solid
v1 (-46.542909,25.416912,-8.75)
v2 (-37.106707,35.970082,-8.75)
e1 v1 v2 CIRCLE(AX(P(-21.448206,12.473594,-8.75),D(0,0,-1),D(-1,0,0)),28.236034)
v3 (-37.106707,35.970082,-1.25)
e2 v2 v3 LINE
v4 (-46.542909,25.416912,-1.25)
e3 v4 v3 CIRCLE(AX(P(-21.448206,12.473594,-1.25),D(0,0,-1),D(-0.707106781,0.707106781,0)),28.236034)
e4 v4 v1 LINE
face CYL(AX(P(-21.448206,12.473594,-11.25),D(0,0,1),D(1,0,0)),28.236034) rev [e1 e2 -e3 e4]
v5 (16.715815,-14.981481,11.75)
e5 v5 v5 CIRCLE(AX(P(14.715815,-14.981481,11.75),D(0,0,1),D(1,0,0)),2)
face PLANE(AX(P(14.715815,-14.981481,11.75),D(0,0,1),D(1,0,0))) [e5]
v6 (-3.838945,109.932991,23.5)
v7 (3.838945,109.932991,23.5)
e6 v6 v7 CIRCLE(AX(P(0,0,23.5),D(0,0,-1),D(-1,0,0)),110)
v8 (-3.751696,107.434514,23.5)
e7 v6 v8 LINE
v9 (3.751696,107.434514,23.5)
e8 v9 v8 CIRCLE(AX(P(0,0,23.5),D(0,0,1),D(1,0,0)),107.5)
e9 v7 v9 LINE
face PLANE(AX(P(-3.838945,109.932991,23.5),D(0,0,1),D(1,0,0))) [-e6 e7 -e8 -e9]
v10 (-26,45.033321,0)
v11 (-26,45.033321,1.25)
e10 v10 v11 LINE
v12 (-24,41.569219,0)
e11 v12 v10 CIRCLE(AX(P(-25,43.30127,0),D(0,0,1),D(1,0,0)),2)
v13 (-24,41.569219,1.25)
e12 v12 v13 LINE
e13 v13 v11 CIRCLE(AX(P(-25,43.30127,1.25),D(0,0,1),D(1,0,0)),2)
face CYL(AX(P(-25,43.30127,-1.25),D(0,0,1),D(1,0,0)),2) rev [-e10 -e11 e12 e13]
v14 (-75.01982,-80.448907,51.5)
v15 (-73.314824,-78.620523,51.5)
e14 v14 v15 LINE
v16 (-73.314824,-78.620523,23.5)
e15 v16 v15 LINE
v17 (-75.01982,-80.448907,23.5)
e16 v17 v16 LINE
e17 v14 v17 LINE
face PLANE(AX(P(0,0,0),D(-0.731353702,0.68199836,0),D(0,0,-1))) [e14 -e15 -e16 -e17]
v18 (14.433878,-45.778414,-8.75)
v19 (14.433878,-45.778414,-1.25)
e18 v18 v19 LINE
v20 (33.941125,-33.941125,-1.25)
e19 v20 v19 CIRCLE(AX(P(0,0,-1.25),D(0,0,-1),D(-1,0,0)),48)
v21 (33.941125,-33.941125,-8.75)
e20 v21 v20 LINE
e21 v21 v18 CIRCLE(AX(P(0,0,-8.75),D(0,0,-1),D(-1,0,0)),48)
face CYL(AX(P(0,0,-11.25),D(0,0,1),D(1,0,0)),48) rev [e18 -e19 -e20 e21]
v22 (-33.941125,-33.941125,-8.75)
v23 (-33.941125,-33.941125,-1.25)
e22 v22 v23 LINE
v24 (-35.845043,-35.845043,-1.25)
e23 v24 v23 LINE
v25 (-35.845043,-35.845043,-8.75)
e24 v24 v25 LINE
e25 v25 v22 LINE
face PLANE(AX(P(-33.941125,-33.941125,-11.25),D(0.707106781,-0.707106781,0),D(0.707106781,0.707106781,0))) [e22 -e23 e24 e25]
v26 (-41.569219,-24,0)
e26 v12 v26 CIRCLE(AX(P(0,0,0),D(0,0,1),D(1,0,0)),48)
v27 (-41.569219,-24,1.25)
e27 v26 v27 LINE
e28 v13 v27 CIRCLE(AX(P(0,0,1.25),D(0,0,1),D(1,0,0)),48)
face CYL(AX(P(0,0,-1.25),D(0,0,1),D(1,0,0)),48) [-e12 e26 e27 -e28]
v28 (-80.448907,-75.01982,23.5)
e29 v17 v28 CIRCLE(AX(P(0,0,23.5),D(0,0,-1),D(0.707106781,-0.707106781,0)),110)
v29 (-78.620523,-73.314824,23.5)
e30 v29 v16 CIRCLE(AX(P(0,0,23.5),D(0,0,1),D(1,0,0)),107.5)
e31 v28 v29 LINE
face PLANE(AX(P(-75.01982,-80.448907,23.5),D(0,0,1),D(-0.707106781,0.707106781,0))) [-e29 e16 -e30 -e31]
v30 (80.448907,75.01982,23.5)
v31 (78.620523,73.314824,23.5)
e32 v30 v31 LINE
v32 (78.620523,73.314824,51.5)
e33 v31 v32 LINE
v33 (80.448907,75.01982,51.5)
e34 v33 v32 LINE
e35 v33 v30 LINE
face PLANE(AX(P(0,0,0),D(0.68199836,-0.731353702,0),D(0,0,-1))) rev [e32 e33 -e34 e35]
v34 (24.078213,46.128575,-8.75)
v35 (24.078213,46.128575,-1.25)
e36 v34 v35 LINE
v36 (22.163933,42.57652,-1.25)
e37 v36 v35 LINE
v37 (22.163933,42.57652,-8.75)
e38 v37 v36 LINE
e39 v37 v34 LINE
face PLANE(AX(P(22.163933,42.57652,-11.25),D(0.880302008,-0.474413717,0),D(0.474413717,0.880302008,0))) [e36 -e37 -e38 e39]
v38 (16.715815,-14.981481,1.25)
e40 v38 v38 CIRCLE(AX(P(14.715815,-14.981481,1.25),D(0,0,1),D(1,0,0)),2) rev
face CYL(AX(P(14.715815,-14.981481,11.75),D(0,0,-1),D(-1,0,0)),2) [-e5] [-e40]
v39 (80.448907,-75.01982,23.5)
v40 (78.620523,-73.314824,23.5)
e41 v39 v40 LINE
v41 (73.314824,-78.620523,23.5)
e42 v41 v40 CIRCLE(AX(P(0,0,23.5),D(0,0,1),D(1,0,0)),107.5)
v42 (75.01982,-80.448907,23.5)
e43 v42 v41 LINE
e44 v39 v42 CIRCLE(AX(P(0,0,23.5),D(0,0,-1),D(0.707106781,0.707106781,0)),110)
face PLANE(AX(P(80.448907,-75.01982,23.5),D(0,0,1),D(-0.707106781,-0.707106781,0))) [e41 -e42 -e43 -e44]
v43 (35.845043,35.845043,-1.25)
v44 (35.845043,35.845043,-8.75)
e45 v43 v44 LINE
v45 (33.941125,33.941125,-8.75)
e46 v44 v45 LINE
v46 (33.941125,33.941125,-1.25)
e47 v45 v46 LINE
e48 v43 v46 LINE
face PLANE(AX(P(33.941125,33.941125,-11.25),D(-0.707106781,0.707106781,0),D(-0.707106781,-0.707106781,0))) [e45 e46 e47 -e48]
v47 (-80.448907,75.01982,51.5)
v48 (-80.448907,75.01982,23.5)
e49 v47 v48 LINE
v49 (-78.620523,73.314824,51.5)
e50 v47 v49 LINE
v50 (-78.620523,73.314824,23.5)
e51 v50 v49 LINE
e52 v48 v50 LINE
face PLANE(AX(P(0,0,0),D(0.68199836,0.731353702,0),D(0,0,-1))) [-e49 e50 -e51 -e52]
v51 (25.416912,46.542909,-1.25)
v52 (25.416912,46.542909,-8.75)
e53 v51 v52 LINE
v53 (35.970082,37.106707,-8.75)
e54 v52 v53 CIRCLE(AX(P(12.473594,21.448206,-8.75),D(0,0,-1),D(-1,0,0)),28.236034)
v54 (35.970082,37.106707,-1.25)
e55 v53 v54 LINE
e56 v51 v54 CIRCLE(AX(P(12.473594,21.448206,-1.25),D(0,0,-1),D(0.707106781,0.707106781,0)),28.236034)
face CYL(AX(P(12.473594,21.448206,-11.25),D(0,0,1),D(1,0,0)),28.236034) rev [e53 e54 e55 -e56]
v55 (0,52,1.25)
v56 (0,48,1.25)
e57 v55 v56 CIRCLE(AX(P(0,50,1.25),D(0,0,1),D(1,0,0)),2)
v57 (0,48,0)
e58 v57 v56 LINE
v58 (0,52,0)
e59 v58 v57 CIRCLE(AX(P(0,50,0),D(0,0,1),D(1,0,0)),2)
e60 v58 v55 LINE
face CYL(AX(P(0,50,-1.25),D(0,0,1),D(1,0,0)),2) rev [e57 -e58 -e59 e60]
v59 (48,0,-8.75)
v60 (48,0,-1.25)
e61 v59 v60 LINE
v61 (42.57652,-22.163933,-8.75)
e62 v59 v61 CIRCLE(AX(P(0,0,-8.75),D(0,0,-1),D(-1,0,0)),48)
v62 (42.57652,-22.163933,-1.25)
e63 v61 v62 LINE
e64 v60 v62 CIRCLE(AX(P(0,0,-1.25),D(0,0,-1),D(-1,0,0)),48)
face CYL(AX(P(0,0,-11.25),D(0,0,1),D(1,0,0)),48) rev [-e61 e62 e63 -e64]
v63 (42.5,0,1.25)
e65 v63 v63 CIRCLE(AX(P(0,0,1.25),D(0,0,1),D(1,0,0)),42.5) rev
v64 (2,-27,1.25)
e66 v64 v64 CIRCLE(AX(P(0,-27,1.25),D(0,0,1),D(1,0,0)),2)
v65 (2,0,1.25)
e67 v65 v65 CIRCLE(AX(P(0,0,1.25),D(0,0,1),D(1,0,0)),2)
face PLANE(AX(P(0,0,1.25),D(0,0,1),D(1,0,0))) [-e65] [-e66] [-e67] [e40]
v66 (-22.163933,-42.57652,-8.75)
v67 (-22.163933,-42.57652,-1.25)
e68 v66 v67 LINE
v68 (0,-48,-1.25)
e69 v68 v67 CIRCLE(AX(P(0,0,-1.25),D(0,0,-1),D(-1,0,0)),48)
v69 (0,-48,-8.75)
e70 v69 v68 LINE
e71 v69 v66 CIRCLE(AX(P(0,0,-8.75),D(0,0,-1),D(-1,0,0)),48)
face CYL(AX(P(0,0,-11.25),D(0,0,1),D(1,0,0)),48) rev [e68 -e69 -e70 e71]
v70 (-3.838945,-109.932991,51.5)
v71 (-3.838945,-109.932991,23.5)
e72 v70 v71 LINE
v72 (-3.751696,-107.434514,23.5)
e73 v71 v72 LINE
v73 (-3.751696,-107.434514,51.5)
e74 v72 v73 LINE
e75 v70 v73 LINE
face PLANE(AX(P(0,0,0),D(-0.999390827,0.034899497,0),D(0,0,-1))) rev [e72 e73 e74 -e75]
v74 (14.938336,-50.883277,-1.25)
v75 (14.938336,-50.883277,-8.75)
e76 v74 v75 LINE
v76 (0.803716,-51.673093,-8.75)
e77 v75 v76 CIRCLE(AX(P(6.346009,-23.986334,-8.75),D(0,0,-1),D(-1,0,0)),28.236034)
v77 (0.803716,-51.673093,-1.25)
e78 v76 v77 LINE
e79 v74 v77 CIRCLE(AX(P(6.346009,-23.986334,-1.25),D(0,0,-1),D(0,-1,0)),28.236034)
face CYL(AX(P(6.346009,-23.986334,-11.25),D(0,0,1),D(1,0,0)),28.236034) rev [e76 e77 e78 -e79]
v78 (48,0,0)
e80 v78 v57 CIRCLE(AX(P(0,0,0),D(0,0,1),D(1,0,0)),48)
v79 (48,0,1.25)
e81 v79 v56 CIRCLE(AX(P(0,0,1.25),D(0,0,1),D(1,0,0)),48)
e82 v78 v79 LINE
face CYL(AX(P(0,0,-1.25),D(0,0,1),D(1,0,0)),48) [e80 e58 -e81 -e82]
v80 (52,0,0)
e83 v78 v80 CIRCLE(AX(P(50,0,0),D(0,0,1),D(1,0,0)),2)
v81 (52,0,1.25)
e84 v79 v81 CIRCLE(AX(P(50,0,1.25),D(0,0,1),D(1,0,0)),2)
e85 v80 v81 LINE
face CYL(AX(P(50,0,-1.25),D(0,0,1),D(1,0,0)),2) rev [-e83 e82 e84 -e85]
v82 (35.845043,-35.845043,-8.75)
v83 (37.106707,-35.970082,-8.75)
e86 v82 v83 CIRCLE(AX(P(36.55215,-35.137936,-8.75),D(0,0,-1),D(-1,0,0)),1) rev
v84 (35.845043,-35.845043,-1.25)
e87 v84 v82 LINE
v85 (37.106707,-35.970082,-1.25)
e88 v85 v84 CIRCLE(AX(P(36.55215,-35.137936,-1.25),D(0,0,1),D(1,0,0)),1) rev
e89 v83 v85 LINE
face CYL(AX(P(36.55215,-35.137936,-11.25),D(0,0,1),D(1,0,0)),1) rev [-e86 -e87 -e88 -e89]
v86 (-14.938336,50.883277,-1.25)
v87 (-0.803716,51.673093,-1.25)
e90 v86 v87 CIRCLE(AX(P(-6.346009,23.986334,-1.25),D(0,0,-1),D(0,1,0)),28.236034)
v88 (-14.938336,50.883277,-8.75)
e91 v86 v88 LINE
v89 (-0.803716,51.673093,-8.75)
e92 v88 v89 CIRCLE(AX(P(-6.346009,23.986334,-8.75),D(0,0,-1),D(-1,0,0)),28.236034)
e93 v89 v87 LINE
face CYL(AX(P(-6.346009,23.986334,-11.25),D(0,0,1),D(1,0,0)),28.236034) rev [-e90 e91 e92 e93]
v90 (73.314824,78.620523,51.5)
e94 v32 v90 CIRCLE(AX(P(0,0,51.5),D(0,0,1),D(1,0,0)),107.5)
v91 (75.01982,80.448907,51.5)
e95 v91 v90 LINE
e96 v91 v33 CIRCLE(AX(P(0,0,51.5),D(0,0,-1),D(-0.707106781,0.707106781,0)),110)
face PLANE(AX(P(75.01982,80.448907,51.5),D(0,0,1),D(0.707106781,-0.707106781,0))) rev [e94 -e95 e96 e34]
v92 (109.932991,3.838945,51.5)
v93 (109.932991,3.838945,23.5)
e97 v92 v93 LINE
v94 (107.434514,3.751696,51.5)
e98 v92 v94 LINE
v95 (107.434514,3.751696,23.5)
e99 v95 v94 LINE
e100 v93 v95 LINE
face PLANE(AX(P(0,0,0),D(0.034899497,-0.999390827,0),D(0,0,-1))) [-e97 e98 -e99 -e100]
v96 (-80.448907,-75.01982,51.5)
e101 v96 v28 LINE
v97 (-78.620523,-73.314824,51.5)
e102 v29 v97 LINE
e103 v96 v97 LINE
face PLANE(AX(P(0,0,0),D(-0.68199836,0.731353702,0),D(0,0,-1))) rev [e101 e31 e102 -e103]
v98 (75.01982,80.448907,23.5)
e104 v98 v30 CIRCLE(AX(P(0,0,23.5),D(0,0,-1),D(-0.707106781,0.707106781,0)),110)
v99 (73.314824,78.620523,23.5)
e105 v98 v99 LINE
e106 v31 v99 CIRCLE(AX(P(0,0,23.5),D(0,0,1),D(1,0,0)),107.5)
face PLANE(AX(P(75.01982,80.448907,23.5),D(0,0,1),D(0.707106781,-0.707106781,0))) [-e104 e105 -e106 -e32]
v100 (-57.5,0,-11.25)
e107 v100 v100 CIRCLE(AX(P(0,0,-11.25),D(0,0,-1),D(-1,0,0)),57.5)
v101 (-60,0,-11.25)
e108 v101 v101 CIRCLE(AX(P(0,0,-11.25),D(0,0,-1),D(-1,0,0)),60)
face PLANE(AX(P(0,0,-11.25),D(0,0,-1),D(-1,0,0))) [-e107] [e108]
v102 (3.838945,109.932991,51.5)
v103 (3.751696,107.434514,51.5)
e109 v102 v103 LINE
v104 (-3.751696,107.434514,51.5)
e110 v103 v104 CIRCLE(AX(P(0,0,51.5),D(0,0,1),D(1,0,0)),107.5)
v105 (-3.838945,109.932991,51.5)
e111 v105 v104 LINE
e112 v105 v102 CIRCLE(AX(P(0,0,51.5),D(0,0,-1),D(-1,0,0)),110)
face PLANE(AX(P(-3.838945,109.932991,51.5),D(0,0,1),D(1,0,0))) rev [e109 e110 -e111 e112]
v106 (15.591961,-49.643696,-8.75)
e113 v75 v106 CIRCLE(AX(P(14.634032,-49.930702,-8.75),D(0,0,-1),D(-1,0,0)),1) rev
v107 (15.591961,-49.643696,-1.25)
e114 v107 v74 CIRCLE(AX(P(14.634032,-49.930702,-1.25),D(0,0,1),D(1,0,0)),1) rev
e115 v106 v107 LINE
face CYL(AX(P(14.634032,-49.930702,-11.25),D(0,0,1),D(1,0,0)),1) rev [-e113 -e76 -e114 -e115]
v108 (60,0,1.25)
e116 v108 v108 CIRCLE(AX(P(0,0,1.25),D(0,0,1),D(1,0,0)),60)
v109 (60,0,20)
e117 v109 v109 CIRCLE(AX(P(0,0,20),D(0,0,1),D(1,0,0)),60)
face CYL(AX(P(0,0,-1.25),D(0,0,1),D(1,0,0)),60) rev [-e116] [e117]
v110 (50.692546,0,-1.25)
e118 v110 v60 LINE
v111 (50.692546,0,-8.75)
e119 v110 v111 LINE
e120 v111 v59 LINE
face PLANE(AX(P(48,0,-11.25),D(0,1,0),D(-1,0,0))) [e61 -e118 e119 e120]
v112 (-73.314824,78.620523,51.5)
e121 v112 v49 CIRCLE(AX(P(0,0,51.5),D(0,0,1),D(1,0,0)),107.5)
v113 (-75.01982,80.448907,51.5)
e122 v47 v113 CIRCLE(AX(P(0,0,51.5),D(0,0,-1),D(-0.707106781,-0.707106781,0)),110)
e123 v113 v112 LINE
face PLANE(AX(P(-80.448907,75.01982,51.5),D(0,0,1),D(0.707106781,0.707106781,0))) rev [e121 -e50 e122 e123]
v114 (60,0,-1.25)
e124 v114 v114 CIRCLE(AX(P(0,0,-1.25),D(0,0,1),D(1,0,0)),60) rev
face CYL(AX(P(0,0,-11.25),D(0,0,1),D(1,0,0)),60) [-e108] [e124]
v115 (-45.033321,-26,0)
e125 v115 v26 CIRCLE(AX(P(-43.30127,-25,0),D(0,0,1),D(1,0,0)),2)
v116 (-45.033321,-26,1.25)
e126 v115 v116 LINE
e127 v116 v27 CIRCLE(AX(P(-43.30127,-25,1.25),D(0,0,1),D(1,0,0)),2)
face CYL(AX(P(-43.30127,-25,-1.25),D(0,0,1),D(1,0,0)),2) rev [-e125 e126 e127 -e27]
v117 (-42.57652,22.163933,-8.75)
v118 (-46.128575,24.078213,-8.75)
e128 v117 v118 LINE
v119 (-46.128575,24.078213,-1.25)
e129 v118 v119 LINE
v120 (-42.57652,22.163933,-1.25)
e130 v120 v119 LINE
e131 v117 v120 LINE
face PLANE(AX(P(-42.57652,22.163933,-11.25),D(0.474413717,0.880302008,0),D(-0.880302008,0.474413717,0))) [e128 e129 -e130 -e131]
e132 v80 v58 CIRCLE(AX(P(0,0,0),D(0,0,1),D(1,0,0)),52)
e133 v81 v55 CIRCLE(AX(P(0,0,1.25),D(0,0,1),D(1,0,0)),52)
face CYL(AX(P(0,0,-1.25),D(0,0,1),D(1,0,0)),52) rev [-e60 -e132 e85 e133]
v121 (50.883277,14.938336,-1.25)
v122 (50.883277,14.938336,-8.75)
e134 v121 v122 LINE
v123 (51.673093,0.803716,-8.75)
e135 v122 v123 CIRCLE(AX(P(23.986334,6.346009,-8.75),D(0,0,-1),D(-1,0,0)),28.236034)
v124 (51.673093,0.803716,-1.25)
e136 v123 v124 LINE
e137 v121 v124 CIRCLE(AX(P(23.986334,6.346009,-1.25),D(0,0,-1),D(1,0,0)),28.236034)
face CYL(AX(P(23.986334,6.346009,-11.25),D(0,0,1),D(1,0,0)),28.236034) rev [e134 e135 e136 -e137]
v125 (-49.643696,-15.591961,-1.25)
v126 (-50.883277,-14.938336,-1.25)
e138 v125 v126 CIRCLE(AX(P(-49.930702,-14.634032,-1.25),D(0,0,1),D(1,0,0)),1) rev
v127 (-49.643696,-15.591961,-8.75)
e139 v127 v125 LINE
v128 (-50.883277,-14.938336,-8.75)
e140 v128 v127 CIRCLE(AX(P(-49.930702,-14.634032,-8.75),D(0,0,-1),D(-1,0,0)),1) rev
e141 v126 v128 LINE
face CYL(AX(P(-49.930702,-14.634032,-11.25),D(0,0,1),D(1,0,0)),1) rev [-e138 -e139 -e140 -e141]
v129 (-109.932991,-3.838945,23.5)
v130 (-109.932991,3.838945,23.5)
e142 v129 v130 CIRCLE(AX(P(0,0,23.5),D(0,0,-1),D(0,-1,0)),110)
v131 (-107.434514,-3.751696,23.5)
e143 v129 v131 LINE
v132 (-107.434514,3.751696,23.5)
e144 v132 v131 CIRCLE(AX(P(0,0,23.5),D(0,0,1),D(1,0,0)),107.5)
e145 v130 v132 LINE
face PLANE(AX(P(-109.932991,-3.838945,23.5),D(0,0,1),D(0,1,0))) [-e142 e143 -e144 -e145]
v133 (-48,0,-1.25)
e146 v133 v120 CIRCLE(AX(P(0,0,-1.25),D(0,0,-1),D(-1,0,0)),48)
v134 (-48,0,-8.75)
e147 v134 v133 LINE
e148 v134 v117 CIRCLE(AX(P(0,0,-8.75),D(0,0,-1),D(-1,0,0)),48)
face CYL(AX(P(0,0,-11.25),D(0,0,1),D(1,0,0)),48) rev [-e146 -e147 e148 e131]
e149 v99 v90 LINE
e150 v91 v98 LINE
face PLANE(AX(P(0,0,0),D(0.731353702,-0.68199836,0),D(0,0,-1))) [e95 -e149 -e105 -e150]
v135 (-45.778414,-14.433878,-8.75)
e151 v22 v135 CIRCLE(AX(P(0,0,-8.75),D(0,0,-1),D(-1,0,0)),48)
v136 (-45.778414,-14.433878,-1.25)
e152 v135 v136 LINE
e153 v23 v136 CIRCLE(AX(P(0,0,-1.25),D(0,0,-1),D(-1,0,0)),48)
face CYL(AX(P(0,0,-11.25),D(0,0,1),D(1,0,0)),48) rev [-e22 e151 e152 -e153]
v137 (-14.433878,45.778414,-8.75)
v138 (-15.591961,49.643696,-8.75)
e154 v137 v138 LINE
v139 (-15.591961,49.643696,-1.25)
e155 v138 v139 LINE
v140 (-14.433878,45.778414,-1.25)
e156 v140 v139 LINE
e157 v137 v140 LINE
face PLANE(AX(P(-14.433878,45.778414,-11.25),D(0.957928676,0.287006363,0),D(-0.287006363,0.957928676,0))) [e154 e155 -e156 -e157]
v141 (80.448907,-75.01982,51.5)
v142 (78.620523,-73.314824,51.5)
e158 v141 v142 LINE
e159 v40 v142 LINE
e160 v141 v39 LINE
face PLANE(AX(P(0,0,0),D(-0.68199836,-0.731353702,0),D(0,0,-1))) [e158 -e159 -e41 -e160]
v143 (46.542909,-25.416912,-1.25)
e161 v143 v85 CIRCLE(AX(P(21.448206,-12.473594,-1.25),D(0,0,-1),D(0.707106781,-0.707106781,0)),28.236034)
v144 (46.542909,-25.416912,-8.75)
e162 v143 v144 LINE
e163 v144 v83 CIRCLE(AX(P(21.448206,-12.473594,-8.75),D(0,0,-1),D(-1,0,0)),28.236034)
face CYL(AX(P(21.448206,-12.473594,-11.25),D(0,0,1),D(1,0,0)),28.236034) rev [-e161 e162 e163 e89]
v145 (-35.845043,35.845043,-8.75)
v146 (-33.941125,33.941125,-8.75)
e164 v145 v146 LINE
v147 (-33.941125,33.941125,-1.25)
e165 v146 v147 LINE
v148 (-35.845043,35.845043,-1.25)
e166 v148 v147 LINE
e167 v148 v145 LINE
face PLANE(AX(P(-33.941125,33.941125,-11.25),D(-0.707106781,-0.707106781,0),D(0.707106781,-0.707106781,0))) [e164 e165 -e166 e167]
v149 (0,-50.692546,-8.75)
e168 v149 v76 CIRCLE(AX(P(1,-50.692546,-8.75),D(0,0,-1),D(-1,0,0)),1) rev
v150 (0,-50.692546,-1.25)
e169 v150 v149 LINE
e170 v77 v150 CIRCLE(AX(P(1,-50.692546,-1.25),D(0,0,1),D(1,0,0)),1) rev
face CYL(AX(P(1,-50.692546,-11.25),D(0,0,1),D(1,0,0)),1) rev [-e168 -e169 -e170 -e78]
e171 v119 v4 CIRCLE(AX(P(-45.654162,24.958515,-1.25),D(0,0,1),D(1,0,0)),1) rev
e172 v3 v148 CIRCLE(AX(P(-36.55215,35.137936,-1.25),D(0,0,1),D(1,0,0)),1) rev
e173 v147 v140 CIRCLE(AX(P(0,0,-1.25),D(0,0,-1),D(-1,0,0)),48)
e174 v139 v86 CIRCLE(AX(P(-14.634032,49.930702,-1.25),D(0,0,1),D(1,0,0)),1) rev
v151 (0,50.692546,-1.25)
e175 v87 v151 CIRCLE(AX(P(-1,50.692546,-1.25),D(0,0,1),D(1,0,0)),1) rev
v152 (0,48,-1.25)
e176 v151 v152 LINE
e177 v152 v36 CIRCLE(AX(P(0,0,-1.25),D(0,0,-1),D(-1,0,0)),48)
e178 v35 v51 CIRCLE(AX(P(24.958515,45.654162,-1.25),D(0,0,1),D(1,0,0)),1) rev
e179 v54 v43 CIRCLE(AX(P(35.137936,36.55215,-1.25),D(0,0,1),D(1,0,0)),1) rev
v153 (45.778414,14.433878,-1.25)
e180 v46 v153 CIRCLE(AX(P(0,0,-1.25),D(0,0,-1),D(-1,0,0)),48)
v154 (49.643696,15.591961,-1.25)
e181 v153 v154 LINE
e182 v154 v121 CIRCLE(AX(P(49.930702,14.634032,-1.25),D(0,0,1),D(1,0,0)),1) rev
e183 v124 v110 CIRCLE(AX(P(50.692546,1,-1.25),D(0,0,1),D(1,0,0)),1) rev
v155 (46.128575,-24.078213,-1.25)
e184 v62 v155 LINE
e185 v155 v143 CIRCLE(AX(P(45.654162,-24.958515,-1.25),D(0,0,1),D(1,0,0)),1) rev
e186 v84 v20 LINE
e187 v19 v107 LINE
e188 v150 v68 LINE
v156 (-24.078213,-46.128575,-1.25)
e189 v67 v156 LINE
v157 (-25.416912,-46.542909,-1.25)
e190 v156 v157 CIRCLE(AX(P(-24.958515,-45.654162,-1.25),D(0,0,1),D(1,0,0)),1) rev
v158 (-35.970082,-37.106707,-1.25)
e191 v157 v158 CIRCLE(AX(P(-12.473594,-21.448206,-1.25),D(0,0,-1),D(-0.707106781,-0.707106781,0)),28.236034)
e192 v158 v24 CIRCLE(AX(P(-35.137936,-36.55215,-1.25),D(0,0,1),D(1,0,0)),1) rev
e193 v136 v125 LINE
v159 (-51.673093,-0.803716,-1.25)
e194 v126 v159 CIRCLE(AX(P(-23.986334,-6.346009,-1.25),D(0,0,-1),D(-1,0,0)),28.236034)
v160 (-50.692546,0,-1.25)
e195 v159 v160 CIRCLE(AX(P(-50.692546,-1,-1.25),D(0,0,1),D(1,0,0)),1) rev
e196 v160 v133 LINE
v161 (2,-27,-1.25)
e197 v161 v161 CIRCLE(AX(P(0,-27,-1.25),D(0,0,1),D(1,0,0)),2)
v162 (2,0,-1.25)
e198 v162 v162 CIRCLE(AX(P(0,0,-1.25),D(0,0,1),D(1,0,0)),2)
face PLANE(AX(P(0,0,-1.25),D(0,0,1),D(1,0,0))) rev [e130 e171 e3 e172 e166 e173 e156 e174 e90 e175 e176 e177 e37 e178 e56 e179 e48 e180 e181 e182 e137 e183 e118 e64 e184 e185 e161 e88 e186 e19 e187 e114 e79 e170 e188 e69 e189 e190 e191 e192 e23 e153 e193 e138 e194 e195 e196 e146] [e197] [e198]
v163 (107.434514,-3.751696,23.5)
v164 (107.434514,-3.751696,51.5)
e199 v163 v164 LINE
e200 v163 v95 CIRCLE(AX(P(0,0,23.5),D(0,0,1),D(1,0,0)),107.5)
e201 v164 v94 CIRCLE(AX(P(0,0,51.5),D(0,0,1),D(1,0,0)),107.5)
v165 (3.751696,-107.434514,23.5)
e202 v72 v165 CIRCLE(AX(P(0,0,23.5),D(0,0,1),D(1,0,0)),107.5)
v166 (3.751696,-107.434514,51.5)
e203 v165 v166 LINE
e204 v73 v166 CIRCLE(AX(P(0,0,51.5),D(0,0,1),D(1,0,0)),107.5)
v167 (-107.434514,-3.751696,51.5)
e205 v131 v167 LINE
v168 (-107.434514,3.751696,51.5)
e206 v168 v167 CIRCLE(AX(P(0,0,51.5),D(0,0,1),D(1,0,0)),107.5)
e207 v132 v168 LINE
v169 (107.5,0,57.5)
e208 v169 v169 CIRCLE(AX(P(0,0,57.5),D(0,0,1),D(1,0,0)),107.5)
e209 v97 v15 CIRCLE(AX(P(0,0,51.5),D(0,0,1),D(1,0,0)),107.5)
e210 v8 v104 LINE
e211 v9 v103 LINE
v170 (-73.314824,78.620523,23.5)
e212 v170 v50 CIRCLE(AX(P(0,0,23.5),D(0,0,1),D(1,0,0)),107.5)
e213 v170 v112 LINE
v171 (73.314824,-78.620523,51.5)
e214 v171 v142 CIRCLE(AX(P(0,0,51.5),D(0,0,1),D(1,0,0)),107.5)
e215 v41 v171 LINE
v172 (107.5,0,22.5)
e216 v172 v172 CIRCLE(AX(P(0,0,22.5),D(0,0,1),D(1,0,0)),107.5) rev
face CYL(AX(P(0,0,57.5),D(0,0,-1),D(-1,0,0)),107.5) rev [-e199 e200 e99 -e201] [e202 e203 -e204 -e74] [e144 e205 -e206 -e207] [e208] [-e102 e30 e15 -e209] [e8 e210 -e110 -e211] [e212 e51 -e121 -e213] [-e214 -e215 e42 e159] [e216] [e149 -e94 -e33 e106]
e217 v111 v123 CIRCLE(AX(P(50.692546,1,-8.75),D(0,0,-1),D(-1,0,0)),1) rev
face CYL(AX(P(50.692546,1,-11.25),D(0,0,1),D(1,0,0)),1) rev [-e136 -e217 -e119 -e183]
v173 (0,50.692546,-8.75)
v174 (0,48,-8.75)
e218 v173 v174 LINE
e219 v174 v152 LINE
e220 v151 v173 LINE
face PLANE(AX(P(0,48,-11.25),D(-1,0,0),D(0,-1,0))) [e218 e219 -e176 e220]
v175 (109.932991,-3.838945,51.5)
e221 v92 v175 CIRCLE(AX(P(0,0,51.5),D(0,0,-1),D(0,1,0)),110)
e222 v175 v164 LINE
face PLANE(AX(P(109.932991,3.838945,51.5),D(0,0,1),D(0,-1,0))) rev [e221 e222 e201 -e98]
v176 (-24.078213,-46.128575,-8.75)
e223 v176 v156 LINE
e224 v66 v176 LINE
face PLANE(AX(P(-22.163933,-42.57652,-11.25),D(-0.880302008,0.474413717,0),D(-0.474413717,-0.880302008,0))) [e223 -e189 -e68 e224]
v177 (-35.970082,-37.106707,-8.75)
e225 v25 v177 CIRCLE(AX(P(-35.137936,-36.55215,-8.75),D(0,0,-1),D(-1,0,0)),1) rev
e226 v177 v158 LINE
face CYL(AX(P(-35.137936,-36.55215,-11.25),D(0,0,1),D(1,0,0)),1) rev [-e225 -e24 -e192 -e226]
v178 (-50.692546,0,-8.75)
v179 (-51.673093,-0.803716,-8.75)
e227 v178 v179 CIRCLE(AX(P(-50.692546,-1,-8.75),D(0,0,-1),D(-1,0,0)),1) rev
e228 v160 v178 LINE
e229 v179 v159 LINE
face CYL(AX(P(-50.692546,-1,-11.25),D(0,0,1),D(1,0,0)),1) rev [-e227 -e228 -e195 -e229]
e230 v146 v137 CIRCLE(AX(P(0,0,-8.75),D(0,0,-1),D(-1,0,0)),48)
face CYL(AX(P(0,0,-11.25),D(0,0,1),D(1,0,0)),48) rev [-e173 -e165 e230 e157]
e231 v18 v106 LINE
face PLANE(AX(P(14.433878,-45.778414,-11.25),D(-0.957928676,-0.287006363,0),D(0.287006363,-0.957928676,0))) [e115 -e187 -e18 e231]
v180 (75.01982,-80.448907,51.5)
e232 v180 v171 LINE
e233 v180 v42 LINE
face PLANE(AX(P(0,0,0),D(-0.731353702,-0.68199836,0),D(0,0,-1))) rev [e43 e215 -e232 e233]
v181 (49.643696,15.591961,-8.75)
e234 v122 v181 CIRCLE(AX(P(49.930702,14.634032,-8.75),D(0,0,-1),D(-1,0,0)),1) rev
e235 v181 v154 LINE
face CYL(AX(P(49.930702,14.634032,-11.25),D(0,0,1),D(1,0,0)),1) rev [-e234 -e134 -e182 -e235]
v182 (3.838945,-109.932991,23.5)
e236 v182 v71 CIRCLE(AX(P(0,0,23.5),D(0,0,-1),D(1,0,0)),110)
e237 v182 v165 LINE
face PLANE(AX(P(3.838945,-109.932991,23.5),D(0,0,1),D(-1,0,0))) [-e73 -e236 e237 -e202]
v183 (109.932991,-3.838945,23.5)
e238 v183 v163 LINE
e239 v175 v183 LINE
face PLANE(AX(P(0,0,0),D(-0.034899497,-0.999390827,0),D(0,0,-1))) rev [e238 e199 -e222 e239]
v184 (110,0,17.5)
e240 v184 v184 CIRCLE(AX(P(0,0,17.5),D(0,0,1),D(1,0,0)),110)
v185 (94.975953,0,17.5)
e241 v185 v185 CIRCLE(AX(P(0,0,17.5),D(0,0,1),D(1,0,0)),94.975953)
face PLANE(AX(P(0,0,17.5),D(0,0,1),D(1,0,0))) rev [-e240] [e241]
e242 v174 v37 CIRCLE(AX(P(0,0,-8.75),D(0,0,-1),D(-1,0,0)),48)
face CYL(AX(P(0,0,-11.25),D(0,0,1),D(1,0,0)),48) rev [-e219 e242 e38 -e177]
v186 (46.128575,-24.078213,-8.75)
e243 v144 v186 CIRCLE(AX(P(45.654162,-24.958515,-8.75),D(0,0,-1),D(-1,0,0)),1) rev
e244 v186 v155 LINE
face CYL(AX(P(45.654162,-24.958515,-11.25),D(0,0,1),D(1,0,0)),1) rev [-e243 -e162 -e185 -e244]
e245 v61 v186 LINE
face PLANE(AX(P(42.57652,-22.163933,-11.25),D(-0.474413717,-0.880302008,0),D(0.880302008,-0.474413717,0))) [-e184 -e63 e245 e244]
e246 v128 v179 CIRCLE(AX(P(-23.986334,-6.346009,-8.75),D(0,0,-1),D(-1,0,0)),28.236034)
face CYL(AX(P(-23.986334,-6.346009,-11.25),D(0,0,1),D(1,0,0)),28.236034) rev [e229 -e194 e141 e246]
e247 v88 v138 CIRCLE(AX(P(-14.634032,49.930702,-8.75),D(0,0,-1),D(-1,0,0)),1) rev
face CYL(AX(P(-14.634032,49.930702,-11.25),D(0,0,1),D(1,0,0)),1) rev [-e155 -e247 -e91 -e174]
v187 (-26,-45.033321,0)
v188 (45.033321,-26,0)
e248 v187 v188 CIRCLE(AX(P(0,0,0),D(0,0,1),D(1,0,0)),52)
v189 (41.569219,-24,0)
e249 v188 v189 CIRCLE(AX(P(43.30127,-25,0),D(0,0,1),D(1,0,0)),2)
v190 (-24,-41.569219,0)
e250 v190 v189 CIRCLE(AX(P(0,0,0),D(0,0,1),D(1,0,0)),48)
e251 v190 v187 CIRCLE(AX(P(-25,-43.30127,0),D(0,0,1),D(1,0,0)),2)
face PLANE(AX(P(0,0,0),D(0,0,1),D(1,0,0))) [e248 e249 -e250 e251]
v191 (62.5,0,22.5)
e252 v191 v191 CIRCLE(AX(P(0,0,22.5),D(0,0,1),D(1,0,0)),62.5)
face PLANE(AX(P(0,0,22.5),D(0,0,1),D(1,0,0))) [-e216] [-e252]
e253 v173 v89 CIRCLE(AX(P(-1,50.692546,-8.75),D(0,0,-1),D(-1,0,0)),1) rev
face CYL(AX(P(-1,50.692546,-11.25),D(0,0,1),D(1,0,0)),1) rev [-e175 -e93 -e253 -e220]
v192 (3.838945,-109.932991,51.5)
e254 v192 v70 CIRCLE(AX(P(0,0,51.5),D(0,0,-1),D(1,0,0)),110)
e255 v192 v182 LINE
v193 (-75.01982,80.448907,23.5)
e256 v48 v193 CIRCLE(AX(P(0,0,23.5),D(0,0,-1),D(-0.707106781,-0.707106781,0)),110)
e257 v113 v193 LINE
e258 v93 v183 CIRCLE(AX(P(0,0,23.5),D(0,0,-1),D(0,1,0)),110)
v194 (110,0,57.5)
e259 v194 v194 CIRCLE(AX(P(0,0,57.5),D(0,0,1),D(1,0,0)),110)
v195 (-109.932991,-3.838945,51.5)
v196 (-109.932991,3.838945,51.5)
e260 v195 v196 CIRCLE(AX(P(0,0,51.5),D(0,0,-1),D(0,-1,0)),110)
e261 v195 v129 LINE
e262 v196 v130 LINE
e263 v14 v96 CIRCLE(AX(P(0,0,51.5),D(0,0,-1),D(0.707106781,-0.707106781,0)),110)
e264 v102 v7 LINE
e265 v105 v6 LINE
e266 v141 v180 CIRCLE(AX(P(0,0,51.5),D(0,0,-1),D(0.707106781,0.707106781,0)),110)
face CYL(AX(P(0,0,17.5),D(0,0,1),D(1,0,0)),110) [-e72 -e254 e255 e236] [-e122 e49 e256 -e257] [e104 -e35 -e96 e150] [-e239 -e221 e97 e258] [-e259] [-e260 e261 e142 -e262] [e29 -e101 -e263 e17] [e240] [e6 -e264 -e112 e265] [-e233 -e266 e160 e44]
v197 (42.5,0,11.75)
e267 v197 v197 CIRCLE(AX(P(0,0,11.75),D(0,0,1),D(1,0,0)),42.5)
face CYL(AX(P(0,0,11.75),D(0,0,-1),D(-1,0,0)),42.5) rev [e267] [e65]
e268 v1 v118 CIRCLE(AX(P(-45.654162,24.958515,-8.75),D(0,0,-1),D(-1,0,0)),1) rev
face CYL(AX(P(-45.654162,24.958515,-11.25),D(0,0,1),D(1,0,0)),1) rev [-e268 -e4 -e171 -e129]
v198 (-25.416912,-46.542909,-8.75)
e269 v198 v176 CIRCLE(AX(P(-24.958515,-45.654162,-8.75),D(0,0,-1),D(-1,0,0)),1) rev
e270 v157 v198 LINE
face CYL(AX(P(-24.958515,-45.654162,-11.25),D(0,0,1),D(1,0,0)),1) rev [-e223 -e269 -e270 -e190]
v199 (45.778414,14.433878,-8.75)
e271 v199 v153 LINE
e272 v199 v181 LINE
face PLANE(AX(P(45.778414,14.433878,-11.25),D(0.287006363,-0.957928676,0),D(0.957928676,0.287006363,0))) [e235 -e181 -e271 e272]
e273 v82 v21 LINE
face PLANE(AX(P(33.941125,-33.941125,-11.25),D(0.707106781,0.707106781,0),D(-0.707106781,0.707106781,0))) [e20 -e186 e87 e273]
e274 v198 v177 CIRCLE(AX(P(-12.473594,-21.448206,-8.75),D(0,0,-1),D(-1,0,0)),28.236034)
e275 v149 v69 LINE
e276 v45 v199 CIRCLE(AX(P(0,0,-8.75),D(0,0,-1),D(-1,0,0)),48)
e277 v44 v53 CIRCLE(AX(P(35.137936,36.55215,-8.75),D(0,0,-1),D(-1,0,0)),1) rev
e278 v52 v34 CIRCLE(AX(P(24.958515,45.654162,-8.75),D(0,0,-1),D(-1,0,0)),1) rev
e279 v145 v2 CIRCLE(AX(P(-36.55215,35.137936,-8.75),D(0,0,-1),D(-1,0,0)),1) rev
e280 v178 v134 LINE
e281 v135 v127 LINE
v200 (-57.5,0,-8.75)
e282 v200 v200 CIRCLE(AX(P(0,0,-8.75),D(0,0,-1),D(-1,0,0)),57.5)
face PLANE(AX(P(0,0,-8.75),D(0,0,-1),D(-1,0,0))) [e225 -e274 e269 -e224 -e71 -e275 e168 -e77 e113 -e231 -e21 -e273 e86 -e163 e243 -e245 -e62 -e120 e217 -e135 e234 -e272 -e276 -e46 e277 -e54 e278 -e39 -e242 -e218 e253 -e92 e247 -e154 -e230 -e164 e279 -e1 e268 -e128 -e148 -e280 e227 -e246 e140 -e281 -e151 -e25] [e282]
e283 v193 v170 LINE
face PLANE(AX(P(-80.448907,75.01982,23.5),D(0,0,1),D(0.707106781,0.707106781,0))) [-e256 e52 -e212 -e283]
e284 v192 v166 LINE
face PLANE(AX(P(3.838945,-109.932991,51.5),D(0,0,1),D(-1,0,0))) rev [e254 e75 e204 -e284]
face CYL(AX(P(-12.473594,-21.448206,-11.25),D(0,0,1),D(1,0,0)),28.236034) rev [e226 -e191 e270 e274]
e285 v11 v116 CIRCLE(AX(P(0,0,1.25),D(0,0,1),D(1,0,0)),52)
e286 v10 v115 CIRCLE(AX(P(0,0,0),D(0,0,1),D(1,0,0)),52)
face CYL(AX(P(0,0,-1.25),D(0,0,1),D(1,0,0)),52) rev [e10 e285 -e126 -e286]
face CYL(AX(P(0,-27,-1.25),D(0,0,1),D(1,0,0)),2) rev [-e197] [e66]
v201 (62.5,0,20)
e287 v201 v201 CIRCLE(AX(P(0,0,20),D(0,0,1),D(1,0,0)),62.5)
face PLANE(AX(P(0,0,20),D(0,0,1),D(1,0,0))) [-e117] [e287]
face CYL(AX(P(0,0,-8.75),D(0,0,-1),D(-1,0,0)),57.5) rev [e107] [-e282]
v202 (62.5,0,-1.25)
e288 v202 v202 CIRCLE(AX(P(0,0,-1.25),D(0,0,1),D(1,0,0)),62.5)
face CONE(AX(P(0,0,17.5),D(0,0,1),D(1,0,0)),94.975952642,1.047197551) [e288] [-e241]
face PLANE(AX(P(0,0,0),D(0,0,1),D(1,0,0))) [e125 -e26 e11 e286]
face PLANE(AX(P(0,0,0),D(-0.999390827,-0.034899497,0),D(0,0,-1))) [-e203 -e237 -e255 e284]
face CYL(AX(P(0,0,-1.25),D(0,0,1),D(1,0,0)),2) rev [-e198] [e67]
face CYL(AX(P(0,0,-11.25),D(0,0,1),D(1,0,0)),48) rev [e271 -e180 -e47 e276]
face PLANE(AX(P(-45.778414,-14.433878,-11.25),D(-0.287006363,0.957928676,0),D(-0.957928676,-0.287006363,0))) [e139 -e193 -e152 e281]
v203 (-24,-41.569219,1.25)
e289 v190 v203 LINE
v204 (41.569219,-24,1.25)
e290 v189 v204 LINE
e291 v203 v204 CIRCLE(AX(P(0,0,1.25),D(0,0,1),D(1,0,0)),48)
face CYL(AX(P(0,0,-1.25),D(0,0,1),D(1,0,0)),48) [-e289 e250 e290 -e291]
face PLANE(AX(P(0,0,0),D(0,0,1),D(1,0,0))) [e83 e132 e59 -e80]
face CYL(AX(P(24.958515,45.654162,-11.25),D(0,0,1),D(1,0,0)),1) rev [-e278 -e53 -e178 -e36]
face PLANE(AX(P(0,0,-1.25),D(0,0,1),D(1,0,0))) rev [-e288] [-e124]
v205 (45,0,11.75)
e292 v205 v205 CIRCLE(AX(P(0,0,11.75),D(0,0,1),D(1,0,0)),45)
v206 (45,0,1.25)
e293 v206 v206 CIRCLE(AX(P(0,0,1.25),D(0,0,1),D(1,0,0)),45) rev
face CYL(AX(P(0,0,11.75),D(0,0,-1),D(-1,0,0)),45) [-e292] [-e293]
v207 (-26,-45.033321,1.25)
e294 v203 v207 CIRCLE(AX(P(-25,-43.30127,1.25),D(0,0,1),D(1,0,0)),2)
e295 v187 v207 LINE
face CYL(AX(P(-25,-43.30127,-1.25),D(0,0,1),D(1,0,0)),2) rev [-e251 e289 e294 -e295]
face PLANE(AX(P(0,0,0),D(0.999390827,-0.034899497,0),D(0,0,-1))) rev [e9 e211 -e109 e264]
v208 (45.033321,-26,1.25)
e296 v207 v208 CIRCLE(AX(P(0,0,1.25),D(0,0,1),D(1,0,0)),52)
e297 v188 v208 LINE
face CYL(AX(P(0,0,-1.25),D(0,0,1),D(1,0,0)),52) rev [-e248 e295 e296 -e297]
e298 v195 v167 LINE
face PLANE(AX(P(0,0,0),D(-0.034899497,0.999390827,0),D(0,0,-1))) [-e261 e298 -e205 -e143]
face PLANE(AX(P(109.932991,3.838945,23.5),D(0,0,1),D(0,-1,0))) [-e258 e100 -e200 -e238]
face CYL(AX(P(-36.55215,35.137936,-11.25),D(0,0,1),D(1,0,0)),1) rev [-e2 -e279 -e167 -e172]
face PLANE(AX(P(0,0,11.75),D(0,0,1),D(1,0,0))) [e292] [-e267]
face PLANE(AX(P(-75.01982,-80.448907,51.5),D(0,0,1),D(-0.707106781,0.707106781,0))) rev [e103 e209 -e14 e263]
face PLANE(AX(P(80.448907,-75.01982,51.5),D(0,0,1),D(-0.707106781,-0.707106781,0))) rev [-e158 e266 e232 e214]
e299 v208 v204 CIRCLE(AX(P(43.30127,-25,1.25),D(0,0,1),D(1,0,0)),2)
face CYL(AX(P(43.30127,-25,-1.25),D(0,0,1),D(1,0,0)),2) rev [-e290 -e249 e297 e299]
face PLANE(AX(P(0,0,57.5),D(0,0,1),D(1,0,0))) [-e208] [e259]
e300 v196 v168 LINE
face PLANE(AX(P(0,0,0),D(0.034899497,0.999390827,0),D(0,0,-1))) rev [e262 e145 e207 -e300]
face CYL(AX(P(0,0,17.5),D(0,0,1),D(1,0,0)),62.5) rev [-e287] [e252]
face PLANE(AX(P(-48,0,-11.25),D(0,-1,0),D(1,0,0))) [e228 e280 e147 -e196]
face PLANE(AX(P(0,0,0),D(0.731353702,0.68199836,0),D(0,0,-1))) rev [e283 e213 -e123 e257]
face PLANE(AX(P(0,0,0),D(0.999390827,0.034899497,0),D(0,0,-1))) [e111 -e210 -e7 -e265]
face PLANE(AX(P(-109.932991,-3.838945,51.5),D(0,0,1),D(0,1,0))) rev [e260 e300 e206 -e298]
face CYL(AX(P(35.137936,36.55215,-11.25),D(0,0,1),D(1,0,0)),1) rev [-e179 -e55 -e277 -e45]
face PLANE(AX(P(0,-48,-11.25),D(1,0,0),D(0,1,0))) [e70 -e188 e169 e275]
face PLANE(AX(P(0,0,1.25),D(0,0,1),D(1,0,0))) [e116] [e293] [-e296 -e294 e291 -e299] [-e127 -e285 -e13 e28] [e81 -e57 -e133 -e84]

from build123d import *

# Parameters (mm, degrees)
BOSS_EXTRUDE1_DEPTH      = 1.25
BOSS_EXTRUDE1_DEPTH_BACK = 1.25
SKETCH1_R                = 60
SKETCH1_R_2              = 45
SKETCH1_R_3              = 42.5
SKETCH1_R_4              = 2
SKETCH1_3_R              = 45
SKETCH1_3_R_2            = 42.5
SKETCH1_3_R_3            = 2
BOSS_EXTRUDE2_DEPTH      = 11.75
BOSS_EXTRUDE3_DEPTH      = 20
BOSS_EXTRUDE3_DEPTH_BACK = 1.25
SKETCH1_4_R              = 62.5
SKETCH1_4_R_2            = 60
BOSS_EXTRUDE4_START      = -1.25
BOSS_EXTRUDE4_DEPTH      = 1.25
BOSS_EXTRUDE5_DEPTH      = 2.5
BOSS_EXTRUDE5_DEPTH_BACK = 2.5
SKETCH2_R                = 110
SKETCH2_R_2              = 107.5
SKETCH2_R_3              = 62.5
SKETCH3_R                = 110
SKETCH3_R_2              = 107.5
BOSS_EXTRUDE6_DEPTH      = 35
BOSS_EXTRUDE7_START      = 10
SKETCH5_R                = 60
SKETCH5_R_2              = 48
BOSS_EXTRUDE7_DEPTH      = 10
CUT_EXTRUDE1_DEPTH       = 167.287589735
FILLET1_R                = 1
CIRPATTERN2_COUNT        = 8
FILLET1_OF_CIRPATTERN2_R = 1
SKETCH7_R                = 57.5
CUT_EXTRUDE2_DEPTH       = 2.5
CUT_REVOLVE1_START       = 23.5
CUT_REVOLVE1_DEPTH       = 28
CIRPATTERN3_COUNT        = 8


# Read off the part's stored shape, not the designer's step: Cut-Revolve1
with BuildPart() as part:
    # Sketch1 → Boss-Extrude1 (new, two sides: drawn at the far end of the back side and taken through both)
    # profile 1 of 4: a face of its own
    with BuildSketch(Plane.XY.offset(-BOSS_EXTRUDE1_DEPTH_BACK)):
        Circle(SKETCH1_R)
        Circle(SKETCH1_R_2, mode=Mode.SUBTRACT)
        with BuildLine():
            ThreePointArc((-45.033320997, -26), (-42.301270189, -26.732050808), (-41.569219382, -24))
            ThreePointArc((-41.569219382, -24), (-46.364439662, 12.423314165), (-24, 41.569219382))
            ThreePointArc((-24, 41.569219382), (-23.267949192, 44.301270189), (-26, 45.033320997))
            ThreePointArc((-26, 45.033320997), (-50.228142967, 13.458590345), (-45.033320997, -26))
        make_face(mode=Mode.SUBTRACT)
        with BuildLine():
            ThreePointArc((45.033320997, -26), (44.301270189, -23.267949192), (41.569219382, -24))
            ThreePointArc((41.569219382, -24), (12.423314165, -46.364439662), (-24, -41.569219382))
            ThreePointArc((-24, -41.569219382), (-26.732050808, -42.301270189), (-26, -45.033320997))
            ThreePointArc((-26, -45.033320997), (13.458590345, -50.228142967), (45.033320997, -26))
        make_face(mode=Mode.SUBTRACT)
        with BuildLine():
            ThreePointArc((0, 52), (-2, 50), (0, 48))
            ThreePointArc((0, 48), (33.941125497, 33.941125497), (48, 0))
            ThreePointArc((48, 0), (50, -2), (52, 0))
            ThreePointArc((52, 0), (36.769552622, 36.769552622), (0, 52))
        make_face(mode=Mode.SUBTRACT)
    # profile 2 of 4: a face of its own
    with BuildSketch(Plane.XY.offset(-BOSS_EXTRUDE1_DEPTH_BACK)):
        Circle(SKETCH1_R_2)
        Circle(SKETCH1_R_3, mode=Mode.SUBTRACT)
    # profile 3 of 4: a face of its own
    with BuildSketch(Plane.XY.offset(-BOSS_EXTRUDE1_DEPTH_BACK)):
        Circle(SKETCH1_R_3)
        Circle(SKETCH1_R_4, mode=Mode.SUBTRACT)
        with Locations((14.715815051, -14.981481481)):
            Circle(SKETCH1_R_4, mode=Mode.SUBTRACT)
        with Locations((0, -27)):
            Circle(SKETCH1_R_4, mode=Mode.SUBTRACT)
    # profile 4 of 4: a face of its own
    with BuildSketch(Plane.XY.offset(-BOSS_EXTRUDE1_DEPTH_BACK)):
        with Locations((14.715815051, -14.981481481)):
            Circle(SKETCH1_R_4)
    extrude(amount=BOSS_EXTRUDE1_DEPTH + BOSS_EXTRUDE1_DEPTH_BACK)

    # Sketch1<3> → Boss-Extrude2 (add)
    # profile 1 of 2: a face of its own
    with BuildSketch(Plane.XY):
        Circle(SKETCH1_3_R)
        Circle(SKETCH1_3_R_2, mode=Mode.SUBTRACT)
    # profile 2 of 2: a face of its own
    with BuildSketch(Plane.XY):
        with Locations((14.715815051, -14.981481481)):
            Circle(SKETCH1_3_R_3)
    extrude(amount=BOSS_EXTRUDE2_DEPTH)

    # Sketch1<4> → Boss-Extrude3 (add, two sides: drawn at the far end of the back side and taken through both)
    with BuildSketch(Plane.XY.offset(-BOSS_EXTRUDE3_DEPTH_BACK)):
        Circle(SKETCH1_4_R)
        Circle(SKETCH1_4_R_2, mode=Mode.SUBTRACT)
    extrude(amount=BOSS_EXTRUDE3_DEPTH + BOSS_EXTRUDE3_DEPTH_BACK)

    # Sketch1<5> → Boss-Extrude4 (add)
    with BuildSketch(Plane.XY.offset(BOSS_EXTRUDE4_START)):
        with BuildLine():
            ThreePointArc((52, 0), (36.769552622, 36.769552622), (0, 52))
            ThreePointArc((0, 52), (-2, 50), (0, 48))
            ThreePointArc((0, 48), (33.941125497, 33.941125497), (48, 0))
            ThreePointArc((48, 0), (50, -2), (52, 0))
        make_face()
        with BuildLine():
            ThreePointArc((-26, 45.033320997), (-50.228142967, 13.458590345), (-45.033320997, -26))
            ThreePointArc((-45.033320997, -26), (-42.301270189, -26.732050808), (-41.569219382, -24))
            ThreePointArc((-41.569219382, -24), (-46.364439662, 12.423314165), (-24, 41.569219382))
            ThreePointArc((-24, 41.569219382), (-23.267949192, 44.301270189), (-26, 45.033320997))
        make_face()
        with BuildLine():
            ThreePointArc((-26, -45.033320997), (13.458590345, -50.228142967), (45.033320997, -26))
            ThreePointArc((45.033320997, -26), (44.301270189, -23.267949192), (41.569219382, -24))
            ThreePointArc((41.569219382, -24), (12.423314165, -46.364439662), (-24, -41.569219382))
            ThreePointArc((-24, -41.569219382), (-26.732050808, -42.301270189), (-26, -45.033320997))
        make_face()
    extrude(amount=BOSS_EXTRUDE4_DEPTH)

    # Sketch5 → Boss-Extrude7 (add)
    with BuildSketch(Plane(origin=(0, 0, -1.25), x_dir=(-1, 0, 0), z_dir=(0, 0, -1)).offset(BOSS_EXTRUDE7_START)):
        with Locations(Location((0, 0, 0), (0, 0, 180))):
            Circle(SKETCH5_R)
        Circle(SKETCH5_R_2, mode=Mode.SUBTRACT)
    extrude(amount=-BOSS_EXTRUDE7_DEPTH)

    # Sketch6 → Cut-Extrude1 (cut, through all)
    with BuildSketch(Plane(origin=(0, 0, -1.25), x_dir=(-1, 0, 0), z_dir=(0, 0, -1))):
        with BuildLine():
            Line((-48, 0), (-51.5, 0))
            ThreePointArc((-51.5, 0), (-52.173802074, 8.001391261), (-50.568057014, 15.868910193))
            Line((-50.568057014, 15.868910193), (-45.778413636, 14.433878376))
            ThreePointArc((-45.778413636, 14.433878376), (-47.441352502, 7.301922537), (-48, 0))
        make_face()
    cut_extrude1 = extrude(amount=CUT_EXTRUDE1_DEPTH, mode=Mode.SUBTRACT)

    # Fillet1
    fillet1_edges = [part.edges().sort_by_distance(p)[0] for p in [
        (50.568057014, 15.868910193, -6.25),
        (51.5, 0, -6.25),
    ]]
    fillet(fillet1_edges, radius=FILLET1_R)

    # CirPattern2: Cut-Extrude1 ×8 about axis
    cirpattern2_axis = Axis((0, 0, 0), (0, 0, 1))
    for i in range(1, CIRPATTERN2_COUNT):
        add(cut_extrude1.rotate(cirpattern2_axis, i * 360 / CIRPATTERN2_COUNT), mode=Mode.SUBTRACT)

    # Fillet1 of CirPattern2
    fillet1_of_cirpattern2_edges = [part.edges().sort_by_distance(p)[0] for p in [
        (24.536002018, 46.978030033, -6.25),
        (36.415999231, 36.415999231, -6.25),
        (-15.868910193, 50.568057014, -6.25),
        (0, 51.5, -6.25),
        (-46.978030033, 24.536002018, -6.25),
        (-36.415999231, 36.415999231, -6.25),
        (-50.568057014, -15.868910193, -6.25),
        (-51.5, 0, -6.25),
        (-24.536002018, -46.978030033, -6.25),
        (-36.415999231, -36.415999231, -6.25),
        (15.868910193, -50.568057014, -6.25),
        (0, -51.5, -6.25),
        (46.978030033, -24.536002018, -6.25),
        (36.415999231, -36.415999231, -6.25),
    ]]
    fillet(fillet1_of_cirpattern2_edges, radius=FILLET1_OF_CIRPATTERN2_R)

    # Sketch7 → Cut-Extrude2 (cut)
    with BuildSketch(Plane(origin=(0, 0, -11.25), x_dir=(-1, 0, 0), z_dir=(0, 0, -1))):
        Circle(SKETCH7_R)
    extrude(amount=-CUT_EXTRUDE2_DEPTH, mode=Mode.SUBTRACT)



with BuildPart() as body_2:
    # Sketch2 → Boss-Extrude5 (new, two sides: drawn at the far end of the back side and taken through both)
    # profile 1 of 2: a face of its own
    with BuildSketch(Plane.XY.offset(20).offset(-BOSS_EXTRUDE5_DEPTH_BACK)):
        Circle(SKETCH2_R)
        Circle(SKETCH2_R_2, mode=Mode.SUBTRACT)
    # profile 2 of 2: a face of its own
    with BuildSketch(Plane.XY.offset(20).offset(-BOSS_EXTRUDE5_DEPTH_BACK)):
        Circle(SKETCH2_R_2)
        Circle(SKETCH2_R_3, mode=Mode.SUBTRACT)
    extrude(amount=BOSS_EXTRUDE5_DEPTH + BOSS_EXTRUDE5_DEPTH_BACK)

    # Sketch3 → Boss-Extrude6 (add)
    with BuildSketch(Plane.XY.offset(22.5)):
        Circle(SKETCH3_R)
        Circle(SKETCH3_R_2, mode=Mode.SUBTRACT)
    extrude(amount=BOSS_EXTRUDE6_DEPTH)

    # Cut-Revolve1 outline → Cut-Revolve1 (cut)
    with BuildSketch(Plane.XY.offset(CUT_REVOLVE1_START)):
        with BuildLine():
            Line((-3.838944637, 109.932990972), (-3.751695896, 107.434513905))
            ThreePointArc((-3.751695896, 107.434513905), (0, 107.5), (3.751695896, 107.434513905))
            Line((3.751695896, 107.434513905), (3.838944637, 109.932990972))
            ThreePointArc((3.838944637, 109.932990972), (0, 110), (-3.838944637, 109.932990972))
        make_face()
    cut_revolve1 = extrude(amount=CUT_REVOLVE1_DEPTH, mode=Mode.SUBTRACT)

    # CirPattern3: Cut-Revolve1 ×8 about axis
    cirpattern3_axis = Axis((0, 0, 0), (0, 0, 1))
    for i in range(1, CIRPATTERN3_COUNT):
        add(cut_revolve1.rotate(cirpattern3_axis, i * 360 / CIRPATTERN3_COUNT), mode=Mode.SUBTRACT)


with BuildPart() as part_1:
    add(part.part)

    add(body_2.part)  # Revolve1 merges body 2
    # Sketch9 → Revolve1 (revolve)
    with BuildSketch(Plane(origin=(0, 0, 0), x_dir=(1, 0, 0), z_dir=(0, 1, 0))):
        Polygon((62.5, 1.25), (94.975952642, -17.5), (62.5, -17.5), align=None)
    revolve(axis=Axis((0, 0, 0), (0, 0, 1)))


solid = part_1.part
